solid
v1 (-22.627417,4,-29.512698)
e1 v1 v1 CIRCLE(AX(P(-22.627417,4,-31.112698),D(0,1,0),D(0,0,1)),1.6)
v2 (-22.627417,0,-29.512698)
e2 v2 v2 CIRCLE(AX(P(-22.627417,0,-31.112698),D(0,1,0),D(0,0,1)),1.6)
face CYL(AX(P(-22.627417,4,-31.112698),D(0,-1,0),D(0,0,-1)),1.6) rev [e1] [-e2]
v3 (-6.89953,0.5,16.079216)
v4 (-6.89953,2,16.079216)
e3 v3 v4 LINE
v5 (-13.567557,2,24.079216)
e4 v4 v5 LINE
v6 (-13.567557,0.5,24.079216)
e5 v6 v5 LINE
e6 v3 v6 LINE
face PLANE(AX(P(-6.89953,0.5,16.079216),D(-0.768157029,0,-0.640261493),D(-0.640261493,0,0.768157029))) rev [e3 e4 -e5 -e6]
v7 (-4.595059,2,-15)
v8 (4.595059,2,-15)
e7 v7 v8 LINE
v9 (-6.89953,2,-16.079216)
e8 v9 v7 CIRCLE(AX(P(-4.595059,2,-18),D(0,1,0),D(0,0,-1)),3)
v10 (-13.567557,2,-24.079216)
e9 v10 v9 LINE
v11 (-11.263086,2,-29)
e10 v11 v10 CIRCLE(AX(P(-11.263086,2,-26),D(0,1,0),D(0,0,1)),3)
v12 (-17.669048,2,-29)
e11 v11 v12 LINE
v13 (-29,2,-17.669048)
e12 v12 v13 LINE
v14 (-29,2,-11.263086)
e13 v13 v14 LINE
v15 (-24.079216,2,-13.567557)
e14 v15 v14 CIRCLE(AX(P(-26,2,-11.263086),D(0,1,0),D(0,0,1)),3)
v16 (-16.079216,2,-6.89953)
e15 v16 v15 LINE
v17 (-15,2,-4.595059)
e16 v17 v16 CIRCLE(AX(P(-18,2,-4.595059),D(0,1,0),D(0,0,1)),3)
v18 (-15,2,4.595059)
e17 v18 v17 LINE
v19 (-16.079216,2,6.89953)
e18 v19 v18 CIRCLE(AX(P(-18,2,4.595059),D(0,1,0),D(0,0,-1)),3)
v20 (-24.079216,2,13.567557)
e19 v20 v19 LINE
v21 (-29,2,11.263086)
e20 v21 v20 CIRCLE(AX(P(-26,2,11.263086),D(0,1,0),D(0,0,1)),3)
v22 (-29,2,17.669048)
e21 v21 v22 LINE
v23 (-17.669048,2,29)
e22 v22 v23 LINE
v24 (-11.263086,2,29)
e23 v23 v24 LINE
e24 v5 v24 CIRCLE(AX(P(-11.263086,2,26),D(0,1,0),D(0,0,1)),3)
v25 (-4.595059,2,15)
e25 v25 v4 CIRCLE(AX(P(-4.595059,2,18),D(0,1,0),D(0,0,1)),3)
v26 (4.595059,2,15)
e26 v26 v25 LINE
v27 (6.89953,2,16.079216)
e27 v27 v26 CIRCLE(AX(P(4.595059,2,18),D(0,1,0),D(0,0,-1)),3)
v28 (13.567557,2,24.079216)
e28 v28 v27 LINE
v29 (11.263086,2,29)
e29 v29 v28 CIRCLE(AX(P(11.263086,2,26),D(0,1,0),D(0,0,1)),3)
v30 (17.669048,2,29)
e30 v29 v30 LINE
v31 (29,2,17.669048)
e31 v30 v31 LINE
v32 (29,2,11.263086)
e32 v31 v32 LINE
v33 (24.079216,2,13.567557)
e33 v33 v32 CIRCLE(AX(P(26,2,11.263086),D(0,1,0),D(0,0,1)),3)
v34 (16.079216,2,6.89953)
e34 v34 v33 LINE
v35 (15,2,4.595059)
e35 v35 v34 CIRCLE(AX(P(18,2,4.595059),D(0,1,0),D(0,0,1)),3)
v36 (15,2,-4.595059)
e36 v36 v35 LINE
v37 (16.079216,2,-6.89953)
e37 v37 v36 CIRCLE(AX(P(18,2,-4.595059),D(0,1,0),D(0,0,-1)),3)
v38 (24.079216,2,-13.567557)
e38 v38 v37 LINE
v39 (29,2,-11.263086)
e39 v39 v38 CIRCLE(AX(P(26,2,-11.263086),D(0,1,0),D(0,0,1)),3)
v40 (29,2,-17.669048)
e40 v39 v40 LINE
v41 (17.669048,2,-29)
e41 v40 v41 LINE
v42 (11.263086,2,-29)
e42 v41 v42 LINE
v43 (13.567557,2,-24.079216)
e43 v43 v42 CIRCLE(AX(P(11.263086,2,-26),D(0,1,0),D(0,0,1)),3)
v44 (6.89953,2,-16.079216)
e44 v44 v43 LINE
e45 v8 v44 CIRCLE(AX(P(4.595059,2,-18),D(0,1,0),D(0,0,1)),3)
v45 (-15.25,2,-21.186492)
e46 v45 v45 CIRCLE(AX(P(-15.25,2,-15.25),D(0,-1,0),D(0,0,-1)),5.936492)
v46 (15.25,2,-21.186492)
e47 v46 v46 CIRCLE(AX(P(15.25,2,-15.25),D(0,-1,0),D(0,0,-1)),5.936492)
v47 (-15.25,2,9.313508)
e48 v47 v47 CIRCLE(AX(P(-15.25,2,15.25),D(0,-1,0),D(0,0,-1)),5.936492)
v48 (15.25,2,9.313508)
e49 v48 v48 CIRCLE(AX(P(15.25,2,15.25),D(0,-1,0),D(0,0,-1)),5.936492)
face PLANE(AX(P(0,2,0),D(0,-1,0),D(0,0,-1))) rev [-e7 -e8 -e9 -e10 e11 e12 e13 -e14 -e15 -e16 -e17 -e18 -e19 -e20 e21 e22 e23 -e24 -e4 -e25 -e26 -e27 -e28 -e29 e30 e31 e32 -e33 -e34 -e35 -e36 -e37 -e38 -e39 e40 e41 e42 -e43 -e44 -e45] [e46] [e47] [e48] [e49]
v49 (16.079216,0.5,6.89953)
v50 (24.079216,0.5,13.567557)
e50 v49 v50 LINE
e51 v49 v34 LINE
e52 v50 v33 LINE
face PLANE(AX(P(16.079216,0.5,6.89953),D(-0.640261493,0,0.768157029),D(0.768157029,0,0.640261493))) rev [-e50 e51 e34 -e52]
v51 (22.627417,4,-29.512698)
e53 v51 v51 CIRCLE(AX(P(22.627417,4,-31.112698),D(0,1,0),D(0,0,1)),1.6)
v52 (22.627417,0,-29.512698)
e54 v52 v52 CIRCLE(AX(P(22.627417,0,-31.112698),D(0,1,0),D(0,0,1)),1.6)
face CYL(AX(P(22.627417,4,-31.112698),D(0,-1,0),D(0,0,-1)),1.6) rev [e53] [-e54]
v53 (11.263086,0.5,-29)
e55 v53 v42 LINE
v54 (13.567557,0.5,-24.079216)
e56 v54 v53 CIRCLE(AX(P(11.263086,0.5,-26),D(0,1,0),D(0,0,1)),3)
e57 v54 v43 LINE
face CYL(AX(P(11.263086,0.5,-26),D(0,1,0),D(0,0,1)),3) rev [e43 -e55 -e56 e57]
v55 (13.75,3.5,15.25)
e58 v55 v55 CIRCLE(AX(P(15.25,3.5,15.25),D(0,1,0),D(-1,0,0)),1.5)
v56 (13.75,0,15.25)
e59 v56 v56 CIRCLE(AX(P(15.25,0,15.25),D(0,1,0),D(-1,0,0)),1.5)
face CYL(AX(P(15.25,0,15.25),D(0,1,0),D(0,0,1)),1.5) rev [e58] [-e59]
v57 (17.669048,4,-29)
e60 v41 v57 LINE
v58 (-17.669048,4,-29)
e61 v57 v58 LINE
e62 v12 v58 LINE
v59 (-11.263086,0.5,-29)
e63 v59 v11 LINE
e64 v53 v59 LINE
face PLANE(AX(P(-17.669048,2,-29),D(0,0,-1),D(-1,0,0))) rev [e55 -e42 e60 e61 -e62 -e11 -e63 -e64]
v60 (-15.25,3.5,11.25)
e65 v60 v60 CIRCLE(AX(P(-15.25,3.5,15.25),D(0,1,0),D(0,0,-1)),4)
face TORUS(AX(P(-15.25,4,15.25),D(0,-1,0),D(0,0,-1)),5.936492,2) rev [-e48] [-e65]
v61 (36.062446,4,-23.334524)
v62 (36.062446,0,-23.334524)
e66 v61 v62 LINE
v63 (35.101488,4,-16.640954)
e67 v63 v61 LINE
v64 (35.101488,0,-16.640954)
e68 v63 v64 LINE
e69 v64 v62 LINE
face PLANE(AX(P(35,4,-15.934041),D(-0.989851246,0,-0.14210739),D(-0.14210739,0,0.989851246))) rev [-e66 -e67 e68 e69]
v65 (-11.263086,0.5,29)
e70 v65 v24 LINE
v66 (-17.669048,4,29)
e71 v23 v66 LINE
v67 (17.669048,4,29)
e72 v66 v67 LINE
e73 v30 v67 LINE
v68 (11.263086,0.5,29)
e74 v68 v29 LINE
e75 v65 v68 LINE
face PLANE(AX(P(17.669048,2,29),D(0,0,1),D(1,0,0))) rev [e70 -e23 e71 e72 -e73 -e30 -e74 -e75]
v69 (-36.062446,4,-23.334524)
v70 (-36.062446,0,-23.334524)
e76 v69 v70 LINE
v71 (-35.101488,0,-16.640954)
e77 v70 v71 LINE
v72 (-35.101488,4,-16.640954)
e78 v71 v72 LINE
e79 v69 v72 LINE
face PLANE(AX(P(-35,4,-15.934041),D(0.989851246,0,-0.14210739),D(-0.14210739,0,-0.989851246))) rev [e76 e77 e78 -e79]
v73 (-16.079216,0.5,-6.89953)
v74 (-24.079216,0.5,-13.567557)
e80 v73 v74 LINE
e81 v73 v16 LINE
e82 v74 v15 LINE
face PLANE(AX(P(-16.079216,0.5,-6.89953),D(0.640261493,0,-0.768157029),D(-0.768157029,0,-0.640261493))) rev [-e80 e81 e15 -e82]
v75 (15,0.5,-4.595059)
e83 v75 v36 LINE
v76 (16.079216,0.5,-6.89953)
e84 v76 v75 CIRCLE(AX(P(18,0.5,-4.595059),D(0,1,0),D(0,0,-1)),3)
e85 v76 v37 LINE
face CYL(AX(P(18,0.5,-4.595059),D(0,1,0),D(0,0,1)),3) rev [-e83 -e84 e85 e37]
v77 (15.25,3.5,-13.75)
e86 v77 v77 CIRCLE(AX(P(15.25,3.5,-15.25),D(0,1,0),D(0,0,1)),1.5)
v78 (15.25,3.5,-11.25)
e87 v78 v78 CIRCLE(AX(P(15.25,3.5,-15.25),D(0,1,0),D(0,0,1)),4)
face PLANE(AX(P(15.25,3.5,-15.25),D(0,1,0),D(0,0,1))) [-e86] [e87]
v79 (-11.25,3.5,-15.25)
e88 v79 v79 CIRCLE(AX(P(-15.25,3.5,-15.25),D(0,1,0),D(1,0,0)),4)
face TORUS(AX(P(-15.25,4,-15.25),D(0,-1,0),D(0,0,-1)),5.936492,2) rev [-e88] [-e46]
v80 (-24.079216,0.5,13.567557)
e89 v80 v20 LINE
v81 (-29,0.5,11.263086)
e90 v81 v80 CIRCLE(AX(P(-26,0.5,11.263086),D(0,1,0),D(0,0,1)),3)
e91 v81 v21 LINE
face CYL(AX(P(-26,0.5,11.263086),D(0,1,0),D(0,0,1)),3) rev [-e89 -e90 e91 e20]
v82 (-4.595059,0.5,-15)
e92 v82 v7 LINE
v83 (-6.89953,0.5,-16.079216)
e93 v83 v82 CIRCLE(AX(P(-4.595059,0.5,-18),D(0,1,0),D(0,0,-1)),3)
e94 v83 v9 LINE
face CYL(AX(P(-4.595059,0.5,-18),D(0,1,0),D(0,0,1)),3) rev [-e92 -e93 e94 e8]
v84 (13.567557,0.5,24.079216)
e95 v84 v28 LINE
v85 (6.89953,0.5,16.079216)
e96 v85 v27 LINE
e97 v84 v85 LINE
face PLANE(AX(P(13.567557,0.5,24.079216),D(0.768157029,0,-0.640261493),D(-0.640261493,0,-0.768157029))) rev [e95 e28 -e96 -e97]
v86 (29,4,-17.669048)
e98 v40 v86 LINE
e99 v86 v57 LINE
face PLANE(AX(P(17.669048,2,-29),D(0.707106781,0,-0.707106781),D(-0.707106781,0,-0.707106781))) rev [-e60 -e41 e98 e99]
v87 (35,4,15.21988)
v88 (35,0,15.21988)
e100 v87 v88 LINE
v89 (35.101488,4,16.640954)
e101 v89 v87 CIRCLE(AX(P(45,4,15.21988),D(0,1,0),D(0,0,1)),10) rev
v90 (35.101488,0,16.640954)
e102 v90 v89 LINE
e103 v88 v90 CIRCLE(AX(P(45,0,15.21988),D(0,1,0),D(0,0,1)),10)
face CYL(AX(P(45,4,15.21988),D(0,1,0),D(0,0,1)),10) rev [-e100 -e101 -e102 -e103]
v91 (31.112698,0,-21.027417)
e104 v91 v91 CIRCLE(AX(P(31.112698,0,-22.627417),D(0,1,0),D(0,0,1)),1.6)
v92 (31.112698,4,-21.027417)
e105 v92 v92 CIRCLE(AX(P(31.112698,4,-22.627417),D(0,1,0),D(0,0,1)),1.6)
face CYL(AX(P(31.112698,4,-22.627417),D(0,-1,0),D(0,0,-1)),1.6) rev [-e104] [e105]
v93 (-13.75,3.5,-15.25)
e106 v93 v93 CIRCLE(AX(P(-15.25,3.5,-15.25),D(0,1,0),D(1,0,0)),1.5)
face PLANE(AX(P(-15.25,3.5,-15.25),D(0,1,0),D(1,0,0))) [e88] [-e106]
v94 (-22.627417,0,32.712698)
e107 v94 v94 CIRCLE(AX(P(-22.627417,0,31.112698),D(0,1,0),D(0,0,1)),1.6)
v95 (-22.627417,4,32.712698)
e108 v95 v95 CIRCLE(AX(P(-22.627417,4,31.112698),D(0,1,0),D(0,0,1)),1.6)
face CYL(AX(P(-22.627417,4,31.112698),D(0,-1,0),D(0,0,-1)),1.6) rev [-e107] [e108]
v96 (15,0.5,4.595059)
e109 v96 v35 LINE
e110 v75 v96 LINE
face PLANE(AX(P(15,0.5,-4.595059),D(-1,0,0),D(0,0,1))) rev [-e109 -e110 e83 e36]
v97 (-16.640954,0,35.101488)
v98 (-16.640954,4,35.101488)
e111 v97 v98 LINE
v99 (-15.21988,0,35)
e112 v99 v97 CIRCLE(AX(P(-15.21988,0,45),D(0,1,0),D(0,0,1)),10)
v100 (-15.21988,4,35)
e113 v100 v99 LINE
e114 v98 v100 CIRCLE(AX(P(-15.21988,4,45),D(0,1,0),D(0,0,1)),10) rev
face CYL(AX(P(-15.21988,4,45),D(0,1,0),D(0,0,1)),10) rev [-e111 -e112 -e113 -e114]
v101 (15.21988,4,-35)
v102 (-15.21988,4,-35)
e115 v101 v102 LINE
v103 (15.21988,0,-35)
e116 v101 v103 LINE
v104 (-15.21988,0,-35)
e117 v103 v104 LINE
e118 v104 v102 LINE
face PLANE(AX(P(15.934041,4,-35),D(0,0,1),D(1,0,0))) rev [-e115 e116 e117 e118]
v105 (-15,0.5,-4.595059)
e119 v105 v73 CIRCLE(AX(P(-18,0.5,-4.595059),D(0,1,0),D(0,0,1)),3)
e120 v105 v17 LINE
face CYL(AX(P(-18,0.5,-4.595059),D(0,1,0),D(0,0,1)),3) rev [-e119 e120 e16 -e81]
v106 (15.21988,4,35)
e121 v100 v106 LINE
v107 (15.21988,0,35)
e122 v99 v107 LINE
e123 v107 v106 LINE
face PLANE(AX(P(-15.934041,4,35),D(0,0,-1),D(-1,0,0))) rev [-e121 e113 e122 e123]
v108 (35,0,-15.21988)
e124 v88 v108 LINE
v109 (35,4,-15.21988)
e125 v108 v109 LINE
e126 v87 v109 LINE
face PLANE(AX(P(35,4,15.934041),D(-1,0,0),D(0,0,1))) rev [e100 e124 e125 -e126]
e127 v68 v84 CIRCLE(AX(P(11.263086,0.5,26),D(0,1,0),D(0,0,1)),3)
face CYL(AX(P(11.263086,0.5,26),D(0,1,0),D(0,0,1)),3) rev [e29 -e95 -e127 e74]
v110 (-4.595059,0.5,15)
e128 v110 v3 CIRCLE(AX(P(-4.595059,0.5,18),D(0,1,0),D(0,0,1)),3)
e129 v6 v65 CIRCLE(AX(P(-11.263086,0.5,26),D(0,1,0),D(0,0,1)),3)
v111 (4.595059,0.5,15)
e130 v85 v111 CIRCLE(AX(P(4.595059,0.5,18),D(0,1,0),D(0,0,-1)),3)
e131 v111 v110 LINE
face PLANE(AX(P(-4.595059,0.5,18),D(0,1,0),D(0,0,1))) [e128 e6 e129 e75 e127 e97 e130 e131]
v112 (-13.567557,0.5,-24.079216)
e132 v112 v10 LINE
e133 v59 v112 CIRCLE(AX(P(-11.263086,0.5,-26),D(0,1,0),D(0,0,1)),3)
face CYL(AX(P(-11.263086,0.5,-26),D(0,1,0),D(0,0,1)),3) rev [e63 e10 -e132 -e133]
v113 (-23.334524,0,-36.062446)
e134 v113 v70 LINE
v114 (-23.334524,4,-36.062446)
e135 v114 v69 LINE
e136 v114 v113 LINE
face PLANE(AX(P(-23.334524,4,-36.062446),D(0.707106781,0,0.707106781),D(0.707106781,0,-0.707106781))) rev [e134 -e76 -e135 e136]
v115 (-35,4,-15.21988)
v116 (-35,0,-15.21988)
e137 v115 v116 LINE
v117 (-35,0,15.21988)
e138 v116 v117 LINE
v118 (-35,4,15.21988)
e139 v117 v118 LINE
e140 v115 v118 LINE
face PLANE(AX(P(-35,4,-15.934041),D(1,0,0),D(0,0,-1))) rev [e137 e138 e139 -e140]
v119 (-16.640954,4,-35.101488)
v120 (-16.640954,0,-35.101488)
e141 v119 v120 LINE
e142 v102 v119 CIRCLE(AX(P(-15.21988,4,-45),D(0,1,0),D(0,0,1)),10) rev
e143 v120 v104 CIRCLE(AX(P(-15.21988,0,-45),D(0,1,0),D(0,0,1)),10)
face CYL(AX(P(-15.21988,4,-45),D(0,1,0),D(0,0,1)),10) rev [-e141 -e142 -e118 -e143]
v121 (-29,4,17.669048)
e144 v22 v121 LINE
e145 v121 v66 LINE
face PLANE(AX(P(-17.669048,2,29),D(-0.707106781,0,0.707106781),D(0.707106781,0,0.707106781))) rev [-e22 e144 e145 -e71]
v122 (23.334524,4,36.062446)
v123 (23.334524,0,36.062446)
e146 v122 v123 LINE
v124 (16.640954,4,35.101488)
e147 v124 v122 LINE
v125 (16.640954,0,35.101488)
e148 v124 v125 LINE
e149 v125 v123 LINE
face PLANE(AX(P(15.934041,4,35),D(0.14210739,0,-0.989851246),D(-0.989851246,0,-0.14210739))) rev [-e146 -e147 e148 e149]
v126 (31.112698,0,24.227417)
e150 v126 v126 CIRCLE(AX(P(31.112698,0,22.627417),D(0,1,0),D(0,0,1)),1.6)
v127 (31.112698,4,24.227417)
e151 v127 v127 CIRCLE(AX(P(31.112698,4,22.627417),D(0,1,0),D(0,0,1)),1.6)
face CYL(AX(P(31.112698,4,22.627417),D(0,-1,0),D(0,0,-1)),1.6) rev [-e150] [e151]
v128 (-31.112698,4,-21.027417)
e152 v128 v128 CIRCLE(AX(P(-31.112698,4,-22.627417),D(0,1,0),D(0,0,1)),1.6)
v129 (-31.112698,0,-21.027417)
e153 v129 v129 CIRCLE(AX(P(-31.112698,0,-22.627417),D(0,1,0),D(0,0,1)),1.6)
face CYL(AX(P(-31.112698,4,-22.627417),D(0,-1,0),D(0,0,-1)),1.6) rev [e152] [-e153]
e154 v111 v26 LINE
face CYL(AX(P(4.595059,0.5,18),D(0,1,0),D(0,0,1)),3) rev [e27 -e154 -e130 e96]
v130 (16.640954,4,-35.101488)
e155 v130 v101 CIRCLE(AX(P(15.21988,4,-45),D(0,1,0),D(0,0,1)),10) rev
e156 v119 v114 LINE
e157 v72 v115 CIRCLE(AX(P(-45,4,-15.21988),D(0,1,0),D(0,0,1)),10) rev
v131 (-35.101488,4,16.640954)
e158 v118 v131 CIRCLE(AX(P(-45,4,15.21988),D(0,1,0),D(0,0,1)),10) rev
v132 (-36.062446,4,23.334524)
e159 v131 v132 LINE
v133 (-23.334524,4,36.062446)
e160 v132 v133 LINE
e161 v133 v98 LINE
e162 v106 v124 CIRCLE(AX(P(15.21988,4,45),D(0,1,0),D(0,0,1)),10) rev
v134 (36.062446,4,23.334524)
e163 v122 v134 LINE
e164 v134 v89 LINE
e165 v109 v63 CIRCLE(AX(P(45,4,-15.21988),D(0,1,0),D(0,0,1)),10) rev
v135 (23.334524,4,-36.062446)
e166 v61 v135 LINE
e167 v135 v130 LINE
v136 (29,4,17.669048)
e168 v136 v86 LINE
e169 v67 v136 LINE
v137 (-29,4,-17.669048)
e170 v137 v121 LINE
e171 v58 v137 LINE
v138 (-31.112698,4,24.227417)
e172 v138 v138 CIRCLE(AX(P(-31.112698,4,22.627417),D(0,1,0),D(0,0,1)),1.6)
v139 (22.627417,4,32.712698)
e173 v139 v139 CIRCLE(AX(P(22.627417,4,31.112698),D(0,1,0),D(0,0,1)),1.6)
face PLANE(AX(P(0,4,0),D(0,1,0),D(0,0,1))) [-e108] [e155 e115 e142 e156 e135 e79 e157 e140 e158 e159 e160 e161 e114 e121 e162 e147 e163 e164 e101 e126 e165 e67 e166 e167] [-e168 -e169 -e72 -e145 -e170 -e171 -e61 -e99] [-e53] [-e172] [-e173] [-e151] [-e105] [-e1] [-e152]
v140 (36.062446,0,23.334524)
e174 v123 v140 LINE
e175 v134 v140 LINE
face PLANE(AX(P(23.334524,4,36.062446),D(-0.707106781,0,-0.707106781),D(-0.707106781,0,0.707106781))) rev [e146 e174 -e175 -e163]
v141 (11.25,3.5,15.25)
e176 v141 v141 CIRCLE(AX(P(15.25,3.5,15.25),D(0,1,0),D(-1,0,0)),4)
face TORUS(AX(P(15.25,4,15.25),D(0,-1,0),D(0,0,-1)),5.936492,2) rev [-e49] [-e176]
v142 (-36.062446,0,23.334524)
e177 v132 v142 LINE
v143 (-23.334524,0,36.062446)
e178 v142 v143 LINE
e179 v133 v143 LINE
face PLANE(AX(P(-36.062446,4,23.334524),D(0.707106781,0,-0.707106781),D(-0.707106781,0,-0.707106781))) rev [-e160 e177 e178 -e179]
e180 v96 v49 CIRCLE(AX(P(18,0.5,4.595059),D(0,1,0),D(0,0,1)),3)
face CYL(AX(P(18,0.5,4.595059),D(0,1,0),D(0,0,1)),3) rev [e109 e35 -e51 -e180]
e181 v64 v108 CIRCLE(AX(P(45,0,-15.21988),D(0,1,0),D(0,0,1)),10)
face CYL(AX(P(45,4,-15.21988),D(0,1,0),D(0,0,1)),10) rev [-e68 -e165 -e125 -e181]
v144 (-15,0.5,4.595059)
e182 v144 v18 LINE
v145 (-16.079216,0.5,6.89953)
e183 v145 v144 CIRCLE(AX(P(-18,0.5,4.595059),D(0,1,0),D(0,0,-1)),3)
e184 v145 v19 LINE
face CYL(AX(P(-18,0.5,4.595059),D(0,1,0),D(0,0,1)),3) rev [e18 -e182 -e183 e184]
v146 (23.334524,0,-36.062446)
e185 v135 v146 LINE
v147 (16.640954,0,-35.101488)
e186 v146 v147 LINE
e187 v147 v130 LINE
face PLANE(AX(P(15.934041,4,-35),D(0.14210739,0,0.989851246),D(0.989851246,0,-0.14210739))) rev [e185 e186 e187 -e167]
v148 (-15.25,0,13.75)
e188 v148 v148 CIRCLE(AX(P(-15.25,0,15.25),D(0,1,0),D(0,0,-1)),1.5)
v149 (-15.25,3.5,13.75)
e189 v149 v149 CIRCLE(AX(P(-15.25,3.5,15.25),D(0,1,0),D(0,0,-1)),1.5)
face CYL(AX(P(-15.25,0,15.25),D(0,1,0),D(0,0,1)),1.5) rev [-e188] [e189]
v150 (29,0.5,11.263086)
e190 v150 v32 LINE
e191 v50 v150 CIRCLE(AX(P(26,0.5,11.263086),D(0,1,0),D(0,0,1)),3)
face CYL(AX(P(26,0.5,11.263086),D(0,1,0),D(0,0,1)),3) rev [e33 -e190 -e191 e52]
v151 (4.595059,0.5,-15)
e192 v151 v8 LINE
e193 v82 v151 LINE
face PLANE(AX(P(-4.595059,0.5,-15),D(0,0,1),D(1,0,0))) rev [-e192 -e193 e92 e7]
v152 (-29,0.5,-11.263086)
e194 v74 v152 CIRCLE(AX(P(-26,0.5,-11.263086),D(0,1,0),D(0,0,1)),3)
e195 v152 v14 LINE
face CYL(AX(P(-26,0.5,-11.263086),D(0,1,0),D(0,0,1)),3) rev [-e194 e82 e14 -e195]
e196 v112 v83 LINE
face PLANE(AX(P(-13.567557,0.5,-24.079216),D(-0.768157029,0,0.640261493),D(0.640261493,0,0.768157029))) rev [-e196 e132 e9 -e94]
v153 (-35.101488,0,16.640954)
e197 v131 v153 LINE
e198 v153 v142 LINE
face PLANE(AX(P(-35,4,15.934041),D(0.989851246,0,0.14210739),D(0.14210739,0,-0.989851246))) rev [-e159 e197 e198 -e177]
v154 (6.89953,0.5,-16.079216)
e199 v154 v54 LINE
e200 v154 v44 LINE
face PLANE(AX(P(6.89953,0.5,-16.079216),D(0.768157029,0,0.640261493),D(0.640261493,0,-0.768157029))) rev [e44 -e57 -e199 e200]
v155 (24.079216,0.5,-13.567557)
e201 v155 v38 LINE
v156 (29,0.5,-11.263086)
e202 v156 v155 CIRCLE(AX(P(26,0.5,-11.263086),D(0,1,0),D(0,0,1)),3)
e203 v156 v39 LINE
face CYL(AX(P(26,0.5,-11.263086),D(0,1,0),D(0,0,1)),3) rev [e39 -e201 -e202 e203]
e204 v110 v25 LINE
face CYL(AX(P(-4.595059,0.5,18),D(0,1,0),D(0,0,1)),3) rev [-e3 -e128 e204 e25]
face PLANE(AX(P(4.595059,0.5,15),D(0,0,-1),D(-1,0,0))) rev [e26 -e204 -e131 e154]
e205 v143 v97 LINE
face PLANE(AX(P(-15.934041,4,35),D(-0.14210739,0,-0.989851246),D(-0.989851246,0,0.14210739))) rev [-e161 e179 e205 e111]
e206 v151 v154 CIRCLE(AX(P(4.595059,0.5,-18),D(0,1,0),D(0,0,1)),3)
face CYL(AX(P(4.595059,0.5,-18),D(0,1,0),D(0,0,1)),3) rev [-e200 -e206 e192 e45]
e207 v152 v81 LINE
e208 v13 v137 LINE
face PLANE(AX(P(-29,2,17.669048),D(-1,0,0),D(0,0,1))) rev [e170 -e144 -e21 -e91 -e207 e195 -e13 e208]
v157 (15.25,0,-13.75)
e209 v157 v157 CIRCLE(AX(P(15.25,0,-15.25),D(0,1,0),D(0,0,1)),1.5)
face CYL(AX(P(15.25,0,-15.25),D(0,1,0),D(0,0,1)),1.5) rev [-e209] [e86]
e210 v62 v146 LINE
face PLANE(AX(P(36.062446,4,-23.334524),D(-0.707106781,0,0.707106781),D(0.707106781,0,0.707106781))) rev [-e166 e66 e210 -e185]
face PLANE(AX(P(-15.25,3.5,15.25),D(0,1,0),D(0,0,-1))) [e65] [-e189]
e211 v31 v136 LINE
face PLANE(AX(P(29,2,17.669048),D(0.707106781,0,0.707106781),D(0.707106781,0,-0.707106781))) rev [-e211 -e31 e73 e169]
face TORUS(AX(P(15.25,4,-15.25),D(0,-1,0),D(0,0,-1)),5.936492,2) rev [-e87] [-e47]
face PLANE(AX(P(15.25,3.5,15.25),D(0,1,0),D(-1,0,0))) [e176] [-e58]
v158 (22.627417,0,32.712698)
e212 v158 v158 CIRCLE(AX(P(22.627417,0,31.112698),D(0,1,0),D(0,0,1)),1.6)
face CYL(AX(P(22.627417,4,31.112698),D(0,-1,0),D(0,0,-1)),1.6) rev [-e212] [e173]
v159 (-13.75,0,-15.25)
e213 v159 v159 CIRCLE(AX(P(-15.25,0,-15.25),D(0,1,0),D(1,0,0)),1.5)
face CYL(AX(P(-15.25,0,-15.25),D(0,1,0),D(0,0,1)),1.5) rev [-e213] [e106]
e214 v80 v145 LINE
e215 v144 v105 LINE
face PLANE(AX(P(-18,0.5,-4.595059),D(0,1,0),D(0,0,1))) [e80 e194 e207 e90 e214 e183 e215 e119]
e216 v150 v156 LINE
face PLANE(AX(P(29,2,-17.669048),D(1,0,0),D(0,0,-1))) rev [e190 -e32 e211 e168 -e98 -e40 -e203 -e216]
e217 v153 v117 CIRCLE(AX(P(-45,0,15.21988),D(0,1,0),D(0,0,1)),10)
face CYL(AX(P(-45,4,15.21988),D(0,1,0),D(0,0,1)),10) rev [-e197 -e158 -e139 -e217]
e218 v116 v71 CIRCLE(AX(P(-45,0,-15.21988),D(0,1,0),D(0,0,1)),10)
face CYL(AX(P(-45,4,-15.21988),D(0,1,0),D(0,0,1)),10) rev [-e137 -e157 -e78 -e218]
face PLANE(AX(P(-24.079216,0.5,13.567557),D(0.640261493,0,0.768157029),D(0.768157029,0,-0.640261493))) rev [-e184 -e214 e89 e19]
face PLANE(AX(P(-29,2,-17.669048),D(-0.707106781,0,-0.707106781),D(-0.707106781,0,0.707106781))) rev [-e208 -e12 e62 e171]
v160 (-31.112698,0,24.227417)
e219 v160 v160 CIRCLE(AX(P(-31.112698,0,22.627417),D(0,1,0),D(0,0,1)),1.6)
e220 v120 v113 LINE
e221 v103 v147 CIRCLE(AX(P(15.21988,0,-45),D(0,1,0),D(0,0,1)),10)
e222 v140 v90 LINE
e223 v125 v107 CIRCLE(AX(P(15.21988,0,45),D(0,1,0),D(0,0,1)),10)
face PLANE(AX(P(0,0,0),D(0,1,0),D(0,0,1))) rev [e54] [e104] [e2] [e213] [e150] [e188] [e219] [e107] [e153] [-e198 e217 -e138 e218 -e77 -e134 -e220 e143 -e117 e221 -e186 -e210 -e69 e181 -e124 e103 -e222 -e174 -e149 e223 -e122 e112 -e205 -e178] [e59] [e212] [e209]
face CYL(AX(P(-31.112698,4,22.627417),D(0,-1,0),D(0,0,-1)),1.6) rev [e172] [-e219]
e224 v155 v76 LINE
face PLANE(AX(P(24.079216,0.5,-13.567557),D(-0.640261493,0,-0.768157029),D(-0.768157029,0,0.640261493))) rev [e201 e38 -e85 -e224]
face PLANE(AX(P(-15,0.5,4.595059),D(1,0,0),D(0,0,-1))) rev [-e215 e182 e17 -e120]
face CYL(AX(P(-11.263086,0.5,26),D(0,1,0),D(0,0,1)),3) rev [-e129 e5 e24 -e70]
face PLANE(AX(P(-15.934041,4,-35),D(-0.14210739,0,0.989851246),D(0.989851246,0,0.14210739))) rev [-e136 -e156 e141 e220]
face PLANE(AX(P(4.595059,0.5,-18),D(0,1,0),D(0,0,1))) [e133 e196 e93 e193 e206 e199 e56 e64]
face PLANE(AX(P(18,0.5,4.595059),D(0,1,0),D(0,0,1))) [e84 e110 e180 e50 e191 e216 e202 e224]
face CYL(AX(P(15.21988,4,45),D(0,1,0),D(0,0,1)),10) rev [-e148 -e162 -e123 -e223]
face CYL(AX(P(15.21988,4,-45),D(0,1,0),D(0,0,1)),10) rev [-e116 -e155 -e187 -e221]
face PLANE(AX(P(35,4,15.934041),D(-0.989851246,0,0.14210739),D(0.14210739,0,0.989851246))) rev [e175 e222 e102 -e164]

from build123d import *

# Parameters (mm, degrees)
SKETCH1_R           = 1.6
BOSS_EXTRUDE1_DEPTH = 4
CUT_EXTRUDE1_DEPTH  = 2
CUT_EXTRUDE2_DEPTH  = 1.5
SKETCH4_R           = 1.5
CUT_EXTRUDE3_DEPTH  = 52.039200621
BOSS_EXTRUDE4_START = 1.5
SKETCH5_R           = 4
SKETCH5_R_2         = 1.5
BOSS_EXTRUDE4_DEPTH = 1.5
CIRPATTERN1_COUNT   = 4
FILLET1_R           = 2
FILLET2_R           = 10


with BuildPart() as part:
    # Sketch1 → Boss-Extrude1 (new body)
    with BuildSketch(Plane(origin=(0, 0, 0), x_dir=(1, 0, 0), z_dir=(0, 1, 0))):
        Polygon((15.934040652, 35), (-15.934040652, 35), (-23.334523779, 36.062445841), (-36.062445841, 23.334523779), (-35, 15.934040652), (-35, -15.934040652), (-36.062445841, -23.334523779), (-23.334523779, -36.062445841), (-15.934040652, -35), (15.934040652, -35), (23.334523779, -36.062445841), (36.062445841, -23.334523779), (35, -15.934040652), (35, 15.934040652), (36.062445841, 23.334523779), (23.334523779, 36.062445841), align=None)
        with Locations(Location((22.627416998, 31.112698372, 0), (0, 0, 270))):
            Circle(SKETCH1_R, mode=Mode.SUBTRACT)
        with Locations(Location((31.112698372, 22.627416998, 0), (0, 0, 270))):
            Circle(SKETCH1_R, mode=Mode.SUBTRACT)
        with Locations(Location((22.627416998, -31.112698372, 0), (0, 0, 270))):
            Circle(SKETCH1_R, mode=Mode.SUBTRACT)
        with Locations(Location((31.112698372, -22.627416998, 0), (0, 0, 270))):
            Circle(SKETCH1_R, mode=Mode.SUBTRACT)
        with Locations(Location((-31.112698372, -22.627416998, 0), (0, 0, 270))):
            Circle(SKETCH1_R, mode=Mode.SUBTRACT)
        with Locations(Location((-22.627416998, -31.112698372, 0), (0, 0, 270))):
            Circle(SKETCH1_R, mode=Mode.SUBTRACT)
        with Locations(Location((-22.627416998, 31.112698372, 0), (0, 0, 270))):
            Circle(SKETCH1_R, mode=Mode.SUBTRACT)
        with Locations(Location((-31.112698372, 22.627416998, 0), (0, 0, 270))):
            Circle(SKETCH1_R, mode=Mode.SUBTRACT)
    extrude(amount=BOSS_EXTRUDE1_DEPTH)

    # Sketch2 → Cut-Extrude1 (cut)
    with BuildSketch(Plane(origin=(0, 4, 0), x_dir=(1, 0, 0), z_dir=(0, 1, 0))):
        Polygon((-17.669047558, 29), (17.669047558, 29), (29, 17.669047558), (29, -17.669047558), (17.669047558, -29), (-17.669047558, -29), (-29, -17.669047558), (-29, 17.669047558), align=None)
    extrude(amount=-CUT_EXTRUDE1_DEPTH, mode=Mode.SUBTRACT)

    # Sketch3 → Cut-Extrude2 (cut)
    with BuildSketch(Plane(origin=(0, 2, 0), x_dir=(1, 0, 0), z_dir=(0, 1, 0))):
        with BuildLine():
            Line((-15, -4.595058717), (-15, 4.595058717))
            ThreePointArc((-15, 4.595058717), (-15.283167889, 5.867388581), (-16.079215521, 6.899529803))
            Line((-16.079215521, 6.899529803), (-24.079215521, 13.567556979))
            ThreePointArc((-24.079215521, 13.567556979), (-27.272329864, 13.979918004), (-29, 11.263085893))
            Line((-29, 11.263085893), (-29, -11.263085893))
            ThreePointArc((-29, -11.263085893), (-27.272329864, -13.979918004), (-24.079215521, -13.567556979))
            Line((-24.079215521, -13.567556979), (-16.079215521, -6.899529803))
            ThreePointArc((-16.079215521, -6.899529803), (-15.283167889, -5.867388581), (-15, -4.595058717))
        make_face()
        with BuildLine():
            Line((-13.567556979, 24.079215521), (-6.899529803, 16.079215521))
            ThreePointArc((-6.899529803, 16.079215521), (-5.867388581, 15.283167889), (-4.595058717, 15))
            Line((-4.595058717, 15), (4.595058717, 15))
            ThreePointArc((4.595058717, 15), (5.867388581, 15.283167889), (6.899529803, 16.079215521))
            Line((6.899529803, 16.079215521), (13.567556979, 24.079215521))
            ThreePointArc((13.567556979, 24.079215521), (13.979918004, 27.272329864), (11.263085893, 29))
            Line((11.263085893, 29), (-11.263085893, 29))
            ThreePointArc((-11.263085893, 29), (-13.979918004, 27.272329864), (-13.567556979, 24.079215521))
        make_face()
        with BuildLine():
            Line((24.079215521, 13.567556979), (16.079215521, 6.899529803))
            ThreePointArc((16.079215521, 6.899529803), (15.283167889, 5.867388581), (15, 4.595058717))
            Line((15, 4.595058717), (15, -4.595058717))
            ThreePointArc((15, -4.595058717), (15.283167889, -5.867388581), (16.079215521, -6.899529803))
            Line((16.079215521, -6.899529803), (24.079215521, -13.567556979))
            ThreePointArc((24.079215521, -13.567556979), (27.272329864, -13.979918004), (29, -11.263085893))
            Line((29, -11.263085893), (29, 11.263085893))
            ThreePointArc((29, 11.263085893), (27.272329864, 13.979918004), (24.079215521, 13.567556979))
        make_face()
        with BuildLine():
            Line((13.567556979, -24.079215521), (6.899529803, -16.079215521))
            ThreePointArc((6.899529803, -16.079215521), (5.867388581, -15.283167889), (4.595058717, -15))
            Line((4.595058717, -15), (-4.595058717, -15))
            ThreePointArc((-4.595058717, -15), (-5.867388581, -15.283167889), (-6.899529803, -16.079215521))
            Line((-6.899529803, -16.079215521), (-13.567556979, -24.079215521))
            ThreePointArc((-13.567556979, -24.079215521), (-13.979918004, -27.272329864), (-11.263085893, -29))
            Line((-11.263085893, -29), (11.263085893, -29))
            ThreePointArc((11.263085893, -29), (13.979918004, -27.272329864), (13.567556979, -24.079215521))
        make_face()
    extrude(amount=-CUT_EXTRUDE2_DEPTH, mode=Mode.SUBTRACT)

    # Sketch4 → Cut-Extrude3 (cut, through all)
    with BuildSketch(Plane(origin=(0, 2, 0), x_dir=(1, 0, 0), z_dir=(0, 1, 0))):
        with Locations(Location((15.25, 15.25, 0), (0, 0, 270))):
            Circle(SKETCH4_R)
    cut_extrude3 = extrude(amount=-CUT_EXTRUDE3_DEPTH, mode=Mode.SUBTRACT)

    # Sketch5 → Boss-Extrude4 (add)
    with BuildSketch(Plane(origin=(0, 2, 0), x_dir=(1, 0, 0), z_dir=(0, 1, 0)).offset(BOSS_EXTRUDE4_START)):
        with Locations(Location((15.25, 15.25, 0), (0, 0, 90))):
            Circle(SKETCH5_R)
        with Locations(Location((15.25, 15.25, 0), (0, 0, 270))):
            Circle(SKETCH5_R_2, mode=Mode.SUBTRACT)
    boss_extrude4 = extrude(amount=-BOSS_EXTRUDE4_DEPTH)

    # CirPattern1: Cut-Extrude3, Boss-Extrude4 ×4 about axis
    cirpattern1_axis = Axis((0, 0, 0), (0, 1, 0))
    add([cut_extrude3.rotate(cirpattern1_axis, i * 360 / CIRPATTERN1_COUNT) for i in range(1, CIRPATTERN1_COUNT)], mode=Mode.SUBTRACT)
    add([boss_extrude4.rotate(cirpattern1_axis, i * 360 / CIRPATTERN1_COUNT) for i in range(1, CIRPATTERN1_COUNT)])

    # Fillet1
    # the kernel refuses this fillet: 2 mm, written as the material it adds along each edge
    with BuildSketch(Plane(origin=(15.25, 2, -15.25), x_dir=(0, 0, -1), z_dir=(1, 0, 0))) as fillet1_piece_1:
        with BuildLine():
            CenterArc((5.936491673, 2), FILLET1_R, 194.477512186, 75.522487814)
            Line((4, 1.5), (3.961270167, 1.49))
            ThreePointArc((3.961270167, 1.49), (3.96, 0.75), (3.96, 0))
            Line((3.96, 0), (4, -0.04))
            Line((4, -0.04), (5.936491673, -0.04))
            Line((5.936491673, -0.04), (5.936491673, 0))
        make_face()
    revolve(axis=Axis((15.25, 2, -15.25), (0, 1, 0)))
    with BuildSketch(Plane(origin=(15.25, 2, 15.25), x_dir=(1, 0, 0), z_dir=(0, 0, 1))) as fillet1_piece_2:
        with BuildLine():
            CenterArc((5.936491673, 2), FILLET1_R, 194.477512186, 75.522487814)
            Line((4, 1.5), (3.961270167, 1.49))
            ThreePointArc((3.961270167, 1.49), (3.96, 0.75), (3.96, 0))
            Line((3.96, 0), (4, -0.04))
            Line((4, -0.04), (5.936491673, -0.04))
            Line((5.936491673, -0.04), (5.936491673, 0))
        make_face()
    revolve(axis=Axis((15.25, 2, 15.25), (0, 1, 0)))
    with BuildSketch(Plane(origin=(-15.25, 2, 15.25), x_dir=(0, 0, 1), z_dir=(-1, 0, 0))) as fillet1_piece_3:
        with BuildLine():
            CenterArc((5.936491673, 2), FILLET1_R, 194.477512186, 75.522487814)
            Line((4, 1.5), (3.961270167, 1.49))
            ThreePointArc((3.961270167, 1.49), (3.96, 0.75), (3.96, 0))
            Line((3.96, 0), (4, -0.04))
            Line((4, -0.04), (5.936491673, -0.04))
            Line((5.936491673, -0.04), (5.936491673, 0))
        make_face()
    revolve(axis=Axis((-15.25, 2, 15.25), (0, 1, 0)))
    with BuildSketch(Plane(origin=(-15.25, 2, -15.25), x_dir=(-1, 0, 0), z_dir=(0, 0, -1))) as fillet1_piece_4:
        with BuildLine():
            CenterArc((5.936491673, 2), FILLET1_R, 194.477512186, 75.522487814)
            Line((4, 1.5), (3.961270167, 1.49))
            ThreePointArc((3.961270167, 1.49), (3.96, 0.75), (3.96, 0))
            Line((3.96, 0), (4, -0.04))
            Line((4, -0.04), (5.936491673, -0.04))
            Line((5.936491673, -0.04), (5.936491673, 0))
        make_face()
    revolve(axis=Axis((-15.25, 2, -15.25), (0, 1, 0)))

    # Fillet2
    fillet2_edges = [part.edges().sort_by_distance(p)[0] for p in [
        (-15.934040652, 2, -35),
        (15.934040652, 2, -35),
        (35, 2, -15.934040652),
        (35, 2, 15.934040652),
        (15.934040652, 2, 35),
        (-15.934040652, 2, 35),
        (-35, 2, 15.934040652),
        (-35, 2, -15.934040652),
    ]]
    fillet(fillet2_edges, radius=FILLET2_R)


solid = part.part
